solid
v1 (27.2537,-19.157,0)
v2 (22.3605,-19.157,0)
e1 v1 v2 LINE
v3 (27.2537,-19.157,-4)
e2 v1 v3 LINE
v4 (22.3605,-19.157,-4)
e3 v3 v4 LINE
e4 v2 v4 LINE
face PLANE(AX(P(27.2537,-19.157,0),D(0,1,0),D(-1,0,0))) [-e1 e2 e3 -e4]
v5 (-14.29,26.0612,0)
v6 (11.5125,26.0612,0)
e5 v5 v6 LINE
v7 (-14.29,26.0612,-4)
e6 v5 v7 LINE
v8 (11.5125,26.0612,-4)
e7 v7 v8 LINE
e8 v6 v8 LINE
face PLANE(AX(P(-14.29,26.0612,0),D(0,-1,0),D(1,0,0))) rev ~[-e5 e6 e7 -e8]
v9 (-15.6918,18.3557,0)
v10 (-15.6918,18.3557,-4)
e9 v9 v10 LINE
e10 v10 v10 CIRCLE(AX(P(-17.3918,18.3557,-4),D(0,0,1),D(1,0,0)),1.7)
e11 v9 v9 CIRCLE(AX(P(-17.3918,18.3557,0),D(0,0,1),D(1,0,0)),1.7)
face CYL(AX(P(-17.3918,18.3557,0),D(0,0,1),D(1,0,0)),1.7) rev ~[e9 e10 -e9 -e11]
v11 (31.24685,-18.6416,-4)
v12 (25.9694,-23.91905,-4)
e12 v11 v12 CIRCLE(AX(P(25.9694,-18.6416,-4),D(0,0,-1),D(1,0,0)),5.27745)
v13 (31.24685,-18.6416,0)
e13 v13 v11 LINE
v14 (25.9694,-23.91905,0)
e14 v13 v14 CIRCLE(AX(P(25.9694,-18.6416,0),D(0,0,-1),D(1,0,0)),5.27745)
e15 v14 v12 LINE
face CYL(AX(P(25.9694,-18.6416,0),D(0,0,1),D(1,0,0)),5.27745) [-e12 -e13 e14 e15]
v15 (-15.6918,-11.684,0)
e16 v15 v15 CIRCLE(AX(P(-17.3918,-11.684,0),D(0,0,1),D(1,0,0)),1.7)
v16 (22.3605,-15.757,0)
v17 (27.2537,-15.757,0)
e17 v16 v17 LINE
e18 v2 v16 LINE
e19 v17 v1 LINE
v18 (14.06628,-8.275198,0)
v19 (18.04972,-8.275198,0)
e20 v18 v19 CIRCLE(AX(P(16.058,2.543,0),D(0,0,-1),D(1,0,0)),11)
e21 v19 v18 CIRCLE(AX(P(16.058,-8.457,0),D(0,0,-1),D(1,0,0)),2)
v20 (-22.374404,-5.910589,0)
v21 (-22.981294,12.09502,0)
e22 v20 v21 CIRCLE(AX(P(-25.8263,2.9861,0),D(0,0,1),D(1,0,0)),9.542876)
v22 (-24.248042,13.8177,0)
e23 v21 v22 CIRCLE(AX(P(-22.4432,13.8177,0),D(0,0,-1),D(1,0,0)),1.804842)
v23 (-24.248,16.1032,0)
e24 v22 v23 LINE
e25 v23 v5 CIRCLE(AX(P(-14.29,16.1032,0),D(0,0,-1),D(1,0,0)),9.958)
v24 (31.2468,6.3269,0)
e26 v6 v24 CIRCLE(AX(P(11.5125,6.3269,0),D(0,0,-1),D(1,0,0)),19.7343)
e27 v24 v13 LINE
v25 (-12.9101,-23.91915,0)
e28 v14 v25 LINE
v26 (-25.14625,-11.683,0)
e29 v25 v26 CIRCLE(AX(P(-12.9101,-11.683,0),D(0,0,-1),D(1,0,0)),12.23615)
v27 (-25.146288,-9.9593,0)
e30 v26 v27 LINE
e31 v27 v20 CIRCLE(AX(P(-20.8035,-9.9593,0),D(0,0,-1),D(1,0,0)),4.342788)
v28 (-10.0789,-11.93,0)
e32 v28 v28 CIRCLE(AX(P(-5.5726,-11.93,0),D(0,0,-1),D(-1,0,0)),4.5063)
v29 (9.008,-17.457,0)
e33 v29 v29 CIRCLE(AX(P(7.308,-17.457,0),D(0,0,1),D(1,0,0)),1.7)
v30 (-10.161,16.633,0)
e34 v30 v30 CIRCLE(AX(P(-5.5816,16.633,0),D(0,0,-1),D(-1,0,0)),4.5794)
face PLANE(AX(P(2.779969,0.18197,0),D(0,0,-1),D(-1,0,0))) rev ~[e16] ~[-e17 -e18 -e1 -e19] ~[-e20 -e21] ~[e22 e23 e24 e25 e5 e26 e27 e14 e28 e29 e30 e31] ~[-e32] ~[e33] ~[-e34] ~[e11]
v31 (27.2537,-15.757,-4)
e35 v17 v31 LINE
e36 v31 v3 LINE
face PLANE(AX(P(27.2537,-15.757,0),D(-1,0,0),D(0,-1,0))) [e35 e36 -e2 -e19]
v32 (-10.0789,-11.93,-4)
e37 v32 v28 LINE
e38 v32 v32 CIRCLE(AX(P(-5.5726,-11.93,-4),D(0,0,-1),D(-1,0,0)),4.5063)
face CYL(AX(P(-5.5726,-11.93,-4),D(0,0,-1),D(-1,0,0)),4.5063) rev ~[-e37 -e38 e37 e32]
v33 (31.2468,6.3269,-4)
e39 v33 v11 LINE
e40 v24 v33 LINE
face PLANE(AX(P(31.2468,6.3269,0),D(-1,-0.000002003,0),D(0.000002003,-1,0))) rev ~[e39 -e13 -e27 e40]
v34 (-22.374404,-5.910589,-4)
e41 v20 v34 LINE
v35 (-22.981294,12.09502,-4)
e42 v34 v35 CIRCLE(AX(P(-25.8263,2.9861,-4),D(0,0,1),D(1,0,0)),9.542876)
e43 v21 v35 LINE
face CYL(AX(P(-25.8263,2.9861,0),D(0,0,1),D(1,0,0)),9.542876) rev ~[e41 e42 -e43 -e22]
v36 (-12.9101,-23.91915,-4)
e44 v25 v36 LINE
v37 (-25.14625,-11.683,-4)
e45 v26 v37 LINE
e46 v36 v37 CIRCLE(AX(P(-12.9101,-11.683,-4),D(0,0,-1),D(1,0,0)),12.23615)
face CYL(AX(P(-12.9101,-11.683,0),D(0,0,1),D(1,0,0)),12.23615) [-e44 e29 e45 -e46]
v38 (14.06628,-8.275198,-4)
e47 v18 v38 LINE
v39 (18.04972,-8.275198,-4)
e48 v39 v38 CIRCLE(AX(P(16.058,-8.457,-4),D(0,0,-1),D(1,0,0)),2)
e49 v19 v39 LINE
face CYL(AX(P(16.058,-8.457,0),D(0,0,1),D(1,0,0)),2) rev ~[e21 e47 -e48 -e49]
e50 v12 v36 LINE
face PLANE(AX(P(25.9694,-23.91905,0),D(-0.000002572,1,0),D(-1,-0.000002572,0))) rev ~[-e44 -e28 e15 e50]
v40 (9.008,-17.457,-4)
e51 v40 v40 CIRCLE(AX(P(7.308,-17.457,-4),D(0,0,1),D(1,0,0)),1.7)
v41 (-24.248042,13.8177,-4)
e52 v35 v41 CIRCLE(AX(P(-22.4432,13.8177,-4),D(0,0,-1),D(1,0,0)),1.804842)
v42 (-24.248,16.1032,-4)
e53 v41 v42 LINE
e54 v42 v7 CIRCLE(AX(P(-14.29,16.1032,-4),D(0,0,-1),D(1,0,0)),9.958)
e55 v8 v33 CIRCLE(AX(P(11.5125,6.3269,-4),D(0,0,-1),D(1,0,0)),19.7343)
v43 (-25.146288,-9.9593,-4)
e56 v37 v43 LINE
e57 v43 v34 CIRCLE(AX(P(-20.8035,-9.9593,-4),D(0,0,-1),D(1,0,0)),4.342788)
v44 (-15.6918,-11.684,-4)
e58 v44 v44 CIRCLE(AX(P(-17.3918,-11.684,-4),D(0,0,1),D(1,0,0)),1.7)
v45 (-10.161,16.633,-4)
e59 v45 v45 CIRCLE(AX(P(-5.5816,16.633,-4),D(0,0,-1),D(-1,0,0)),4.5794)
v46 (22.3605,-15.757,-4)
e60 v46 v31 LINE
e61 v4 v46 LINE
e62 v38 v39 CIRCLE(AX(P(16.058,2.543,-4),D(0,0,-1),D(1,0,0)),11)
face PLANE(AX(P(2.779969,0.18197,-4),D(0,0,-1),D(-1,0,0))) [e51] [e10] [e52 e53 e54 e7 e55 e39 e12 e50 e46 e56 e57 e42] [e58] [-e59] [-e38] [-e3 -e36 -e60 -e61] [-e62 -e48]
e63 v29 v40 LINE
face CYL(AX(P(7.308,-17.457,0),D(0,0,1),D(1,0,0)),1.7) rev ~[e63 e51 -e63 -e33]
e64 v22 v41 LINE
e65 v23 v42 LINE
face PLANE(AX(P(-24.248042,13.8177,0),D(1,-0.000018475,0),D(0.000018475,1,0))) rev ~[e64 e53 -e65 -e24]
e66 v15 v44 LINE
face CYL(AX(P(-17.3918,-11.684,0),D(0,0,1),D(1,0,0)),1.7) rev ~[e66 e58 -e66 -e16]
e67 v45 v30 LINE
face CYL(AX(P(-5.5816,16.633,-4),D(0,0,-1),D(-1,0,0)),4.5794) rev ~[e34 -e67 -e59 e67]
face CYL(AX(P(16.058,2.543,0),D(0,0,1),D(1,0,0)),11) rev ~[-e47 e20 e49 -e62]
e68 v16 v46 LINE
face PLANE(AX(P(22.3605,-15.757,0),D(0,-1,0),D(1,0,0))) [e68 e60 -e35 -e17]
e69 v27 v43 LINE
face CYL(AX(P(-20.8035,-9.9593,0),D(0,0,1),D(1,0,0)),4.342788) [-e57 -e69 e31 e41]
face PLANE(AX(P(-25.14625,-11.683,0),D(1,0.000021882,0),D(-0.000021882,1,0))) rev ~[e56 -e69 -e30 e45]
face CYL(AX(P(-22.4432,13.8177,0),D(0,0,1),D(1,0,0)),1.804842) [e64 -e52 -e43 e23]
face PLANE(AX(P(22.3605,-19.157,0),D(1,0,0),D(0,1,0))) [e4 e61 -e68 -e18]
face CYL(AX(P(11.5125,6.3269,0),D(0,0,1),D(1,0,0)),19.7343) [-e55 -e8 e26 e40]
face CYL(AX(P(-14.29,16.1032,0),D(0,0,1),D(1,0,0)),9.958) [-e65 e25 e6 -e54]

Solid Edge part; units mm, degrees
sketch "Sketch1" plane through (0, 0, 0) normal (0, 0, 1) x (1, 0, 0)
  arc A0 (-24.2481, 16.1032) -> (-14.29, 26.0612) centre (-14.29, 16.1032) cw
  line L0 (-14.29, 26.0612) -> (11.5125, 26.0612)
  arc A1 (11.5125, 26.0612) -> (31.2468, 6.3269) centre (11.5125, 6.3269) cw
  line L1 (31.2468, 6.3269) -> (31.2468, -18.6416)
  arc A2 (31.2468, -18.6416) -> (25.9694, -23.9191) centre (25.9694, -18.6416) cw
  line L2 (25.9694, -23.9191) -> (-12.9101, -23.9191)
  arc A3 (-12.9101, -23.9191) -> (-25.1463, -11.683) centre (-12.9101, -11.683) cw
  line L3 (-25.1463, -11.683) -> (-25.1463, -9.9593)
  arc A4 (-25.1463, -9.9593) -> (-22.3744, -5.9106) centre (-20.8035, -9.9593) cw
  arc A5 (-22.3744, -5.9106) -> (-22.9813, 12.095) centre (-25.8263, 2.9861) ccw
  arc A6 (-22.9813, 12.095) -> (-24.2481, 13.8177) centre (-22.4432, 13.8177) cw
  line L4 (-24.2481, 13.8177) -> (-24.2481, 16.1032)
  circle A7 centre (7.308, -17.457) radius 1.7
  arc A8 (18.0497, -8.2752) -> (14.0663, -8.2752) centre (16.058, -8.457) cw
  arc A9 (14.0663, -8.2752) -> (18.0497, -8.2752) centre (16.058, 2.543) cw
  circle A10 centre (-17.3918, -11.684) radius 1.7
  circle A11 centre (-17.3918, 18.3557) radius 1.7
  line L5 (27.2537, -19.157) -> (22.3605, -19.157)
  line L6 (27.2537, -15.757) -> (27.2537, -19.157)
  line L7 (22.3605, -15.757) -> (27.2537, -15.757)
  line L8 (22.3605, -19.157) -> (22.3605, -15.757)
extrude "Protrusion1" add sketch "Sketch1" against normal blind 4
sketch "Sketch2" plane through (3.0503, 1.0711, -4) normal (0, 0, -1) x (-1, 0, 0)
  circle A0 centre (8.6319, 15.5619) radius 4.5794
  circle A1 centre (8.6229, -13.0011) radius 4.5063
extrude "Cutout1" cut sketch "Sketch2" against normal up to next
